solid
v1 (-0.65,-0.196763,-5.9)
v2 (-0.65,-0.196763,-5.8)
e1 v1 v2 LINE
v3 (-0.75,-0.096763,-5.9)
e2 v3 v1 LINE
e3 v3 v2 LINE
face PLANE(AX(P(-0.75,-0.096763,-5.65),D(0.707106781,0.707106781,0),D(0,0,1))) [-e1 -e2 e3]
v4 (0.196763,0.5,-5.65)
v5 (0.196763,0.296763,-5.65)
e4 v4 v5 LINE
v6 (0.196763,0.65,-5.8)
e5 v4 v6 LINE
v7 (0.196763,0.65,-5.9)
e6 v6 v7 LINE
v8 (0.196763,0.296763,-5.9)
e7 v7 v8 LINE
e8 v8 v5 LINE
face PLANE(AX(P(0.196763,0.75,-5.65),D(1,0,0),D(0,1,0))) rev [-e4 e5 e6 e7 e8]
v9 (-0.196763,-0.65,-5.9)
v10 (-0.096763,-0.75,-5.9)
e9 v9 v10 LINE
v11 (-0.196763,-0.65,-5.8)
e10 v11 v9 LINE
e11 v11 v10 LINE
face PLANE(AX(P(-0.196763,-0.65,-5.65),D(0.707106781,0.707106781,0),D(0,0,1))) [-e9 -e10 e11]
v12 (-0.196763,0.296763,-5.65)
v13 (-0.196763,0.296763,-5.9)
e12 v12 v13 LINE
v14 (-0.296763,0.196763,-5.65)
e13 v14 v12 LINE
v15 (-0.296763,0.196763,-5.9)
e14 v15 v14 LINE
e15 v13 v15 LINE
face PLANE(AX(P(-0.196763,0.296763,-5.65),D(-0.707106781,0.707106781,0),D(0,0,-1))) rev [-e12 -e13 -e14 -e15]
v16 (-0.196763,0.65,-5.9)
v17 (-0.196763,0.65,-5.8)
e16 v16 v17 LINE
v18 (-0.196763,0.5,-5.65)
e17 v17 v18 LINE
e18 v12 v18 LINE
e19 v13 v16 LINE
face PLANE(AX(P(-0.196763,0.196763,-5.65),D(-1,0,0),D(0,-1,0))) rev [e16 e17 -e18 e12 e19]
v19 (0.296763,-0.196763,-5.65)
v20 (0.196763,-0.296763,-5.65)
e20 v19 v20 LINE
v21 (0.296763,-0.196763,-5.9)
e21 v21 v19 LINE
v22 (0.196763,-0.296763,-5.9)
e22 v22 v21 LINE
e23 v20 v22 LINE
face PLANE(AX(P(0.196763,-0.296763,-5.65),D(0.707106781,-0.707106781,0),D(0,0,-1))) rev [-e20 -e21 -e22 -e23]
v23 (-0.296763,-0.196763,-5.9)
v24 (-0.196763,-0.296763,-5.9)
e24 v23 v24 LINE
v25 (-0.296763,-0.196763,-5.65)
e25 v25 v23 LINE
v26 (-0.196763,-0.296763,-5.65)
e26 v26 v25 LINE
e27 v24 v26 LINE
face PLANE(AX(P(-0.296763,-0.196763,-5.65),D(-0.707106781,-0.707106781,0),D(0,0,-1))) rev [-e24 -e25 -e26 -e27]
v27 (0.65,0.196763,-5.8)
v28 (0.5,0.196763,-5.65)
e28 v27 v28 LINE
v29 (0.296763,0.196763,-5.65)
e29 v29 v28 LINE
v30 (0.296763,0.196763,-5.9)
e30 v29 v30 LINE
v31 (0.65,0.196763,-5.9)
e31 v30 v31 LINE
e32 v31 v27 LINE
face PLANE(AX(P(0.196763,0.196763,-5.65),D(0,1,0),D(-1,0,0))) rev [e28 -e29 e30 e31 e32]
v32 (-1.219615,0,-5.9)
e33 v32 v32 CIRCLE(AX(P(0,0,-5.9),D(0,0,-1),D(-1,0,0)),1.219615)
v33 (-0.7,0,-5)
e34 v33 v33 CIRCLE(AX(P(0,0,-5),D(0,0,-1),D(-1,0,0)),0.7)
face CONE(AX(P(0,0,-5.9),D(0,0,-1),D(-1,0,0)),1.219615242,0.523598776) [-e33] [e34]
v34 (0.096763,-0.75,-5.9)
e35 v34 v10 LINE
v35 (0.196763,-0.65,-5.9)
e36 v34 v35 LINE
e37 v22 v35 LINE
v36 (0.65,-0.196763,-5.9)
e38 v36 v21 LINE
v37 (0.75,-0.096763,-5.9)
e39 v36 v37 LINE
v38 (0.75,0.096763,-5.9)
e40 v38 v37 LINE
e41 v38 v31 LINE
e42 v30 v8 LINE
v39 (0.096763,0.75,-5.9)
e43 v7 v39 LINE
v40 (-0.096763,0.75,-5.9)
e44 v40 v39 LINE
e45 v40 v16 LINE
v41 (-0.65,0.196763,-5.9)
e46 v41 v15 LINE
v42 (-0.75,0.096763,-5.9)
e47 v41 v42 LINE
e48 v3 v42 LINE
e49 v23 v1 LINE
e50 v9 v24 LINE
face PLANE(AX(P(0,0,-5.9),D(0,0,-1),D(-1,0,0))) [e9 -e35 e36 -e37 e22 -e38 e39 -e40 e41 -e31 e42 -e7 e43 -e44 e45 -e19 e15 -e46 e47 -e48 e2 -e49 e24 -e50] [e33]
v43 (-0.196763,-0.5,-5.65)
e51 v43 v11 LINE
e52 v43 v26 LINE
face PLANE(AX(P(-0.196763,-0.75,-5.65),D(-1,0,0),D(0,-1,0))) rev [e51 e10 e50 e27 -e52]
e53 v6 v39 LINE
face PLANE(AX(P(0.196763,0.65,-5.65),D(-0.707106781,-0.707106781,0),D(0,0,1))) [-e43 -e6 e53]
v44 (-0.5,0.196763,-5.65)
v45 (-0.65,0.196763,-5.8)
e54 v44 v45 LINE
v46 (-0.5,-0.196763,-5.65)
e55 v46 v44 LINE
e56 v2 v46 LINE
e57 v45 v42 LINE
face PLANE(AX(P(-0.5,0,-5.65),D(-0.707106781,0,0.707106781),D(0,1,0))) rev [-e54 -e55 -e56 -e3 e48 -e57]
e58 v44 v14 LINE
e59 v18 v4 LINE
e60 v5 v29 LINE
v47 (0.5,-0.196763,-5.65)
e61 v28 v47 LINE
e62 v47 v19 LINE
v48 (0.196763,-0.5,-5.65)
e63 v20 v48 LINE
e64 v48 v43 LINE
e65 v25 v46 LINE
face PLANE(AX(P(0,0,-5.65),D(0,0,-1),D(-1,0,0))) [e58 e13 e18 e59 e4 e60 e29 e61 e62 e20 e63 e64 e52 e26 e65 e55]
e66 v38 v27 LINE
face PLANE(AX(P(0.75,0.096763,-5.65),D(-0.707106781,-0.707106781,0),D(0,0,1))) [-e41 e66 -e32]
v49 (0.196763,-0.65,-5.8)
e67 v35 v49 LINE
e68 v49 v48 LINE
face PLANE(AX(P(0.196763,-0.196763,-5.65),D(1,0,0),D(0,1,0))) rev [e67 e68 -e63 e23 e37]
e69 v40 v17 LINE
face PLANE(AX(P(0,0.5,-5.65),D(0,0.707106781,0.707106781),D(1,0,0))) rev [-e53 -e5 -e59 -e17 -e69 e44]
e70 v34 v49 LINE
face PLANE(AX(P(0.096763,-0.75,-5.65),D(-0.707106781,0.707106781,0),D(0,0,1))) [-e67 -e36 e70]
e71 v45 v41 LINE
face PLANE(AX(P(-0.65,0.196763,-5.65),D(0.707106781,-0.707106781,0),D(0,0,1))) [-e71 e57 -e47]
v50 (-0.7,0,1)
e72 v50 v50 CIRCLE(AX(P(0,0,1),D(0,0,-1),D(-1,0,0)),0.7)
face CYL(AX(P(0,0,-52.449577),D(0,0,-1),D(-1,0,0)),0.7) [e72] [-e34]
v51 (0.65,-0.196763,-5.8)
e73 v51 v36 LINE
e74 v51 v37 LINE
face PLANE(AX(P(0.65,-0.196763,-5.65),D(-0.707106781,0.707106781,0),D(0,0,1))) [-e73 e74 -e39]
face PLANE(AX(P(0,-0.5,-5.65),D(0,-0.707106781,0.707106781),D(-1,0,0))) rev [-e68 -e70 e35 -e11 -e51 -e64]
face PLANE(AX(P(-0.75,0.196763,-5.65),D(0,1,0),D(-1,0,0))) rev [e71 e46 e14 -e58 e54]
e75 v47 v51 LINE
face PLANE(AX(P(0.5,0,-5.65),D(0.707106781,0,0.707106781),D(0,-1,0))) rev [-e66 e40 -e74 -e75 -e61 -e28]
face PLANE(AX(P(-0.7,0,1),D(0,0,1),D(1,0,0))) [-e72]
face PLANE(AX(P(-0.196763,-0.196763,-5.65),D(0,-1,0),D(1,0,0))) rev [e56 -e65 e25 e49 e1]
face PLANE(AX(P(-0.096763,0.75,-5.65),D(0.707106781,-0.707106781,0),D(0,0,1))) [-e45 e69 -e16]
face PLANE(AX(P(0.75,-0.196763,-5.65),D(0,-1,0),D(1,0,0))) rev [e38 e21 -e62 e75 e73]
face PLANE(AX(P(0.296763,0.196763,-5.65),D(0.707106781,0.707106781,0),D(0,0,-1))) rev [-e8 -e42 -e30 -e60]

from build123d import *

# Parameters (mm, degrees)
CUT_EXTRUDE1_DEPTH = 0.25
CHAMFER1_SIZE      = 0.1
CHAMFER2_SIZE      = 0.1
CHAMFER3_SIZE      = 0.25


with BuildPart() as part:
    # Sketch2 → Revolve1 (revolve)
    with BuildSketch(Plane(origin=(0, 0, 0), x_dir=(1, 0, 0), z_dir=(0, 1, 0))):
        Polygon((0, 0), (0, 5.9), (-1.219615242, 5.9), (-0.7, 5), (-0.7, -1), (0, -1), align=None)
    revolve(axis=Axis((0, 0, -52.449576884), (0, 0, 1)))

    # Sketch4 → Cut-Extrude1 (cut)
    with BuildSketch(Plane(origin=(0, 0, -5.9), x_dir=(-1, 0, 0), z_dir=(0, 0, -1))):
        Polygon((0, 0.75), (-0.196763203, 0.75), (-0.196763203, 0.196763203), (-0.75, 0.196763203), (-0.75, -0.196763203), (-0.196763203, -0.196763203), (-0.196763203, -0.75), (0.196763203, -0.75), (0.196763203, -0.196763203), (0.75, -0.196763203), (0.75, 0.196763203), (0.196763203, 0.196763203), (0.196763203, 0.75), align=None)
    extrude(amount=-CUT_EXTRUDE1_DEPTH, mode=Mode.SUBTRACT)

    # Chamfer1
    chamfer1_edges = [part.edges().sort_by_distance(p)[0] for p in [
        (-0.196763203, 0.196763203, -5.775),
        (-0.196763203, -0.196763203, -5.775),
        (0.196763203, -0.196763203, -5.775),
        (0.196763203, 0.196763203, -5.775),
    ]]
    chamfer(chamfer1_edges, length=CHAMFER1_SIZE)

    # Chamfer2
    chamfer2_edges = [part.edges().sort_by_distance(p)[0] for p in [
        (-0.196763203, 0.75, -5.775),
        (-0.75, 0.196763203, -5.775),
        (-0.75, -0.196763203, -5.775),
        (-0.196763203, -0.75, -5.775),
        (0.196763203, -0.75, -5.775),
        (0.75, -0.196763203, -5.775),
        (0.75, 0.196763203, -5.775),
        (0.196763203, 0.75, -5.775),
    ]]
    chamfer(chamfer2_edges, length=CHAMFER2_SIZE)

    # Chamfer3
    chamfer3_edges = [part.edges().sort_by_distance(p)[0] for p in [
        (0, -0.75, -5.65),
        (0.75, 0, -5.65),
        (-0.75, 0, -5.65),
        (0, 0.75, -5.65),
    ]]
    chamfer(chamfer3_edges, length=CHAMFER3_SIZE - 0.0001)  # a hair under: the kernel refuses the full size


solid = part.part
